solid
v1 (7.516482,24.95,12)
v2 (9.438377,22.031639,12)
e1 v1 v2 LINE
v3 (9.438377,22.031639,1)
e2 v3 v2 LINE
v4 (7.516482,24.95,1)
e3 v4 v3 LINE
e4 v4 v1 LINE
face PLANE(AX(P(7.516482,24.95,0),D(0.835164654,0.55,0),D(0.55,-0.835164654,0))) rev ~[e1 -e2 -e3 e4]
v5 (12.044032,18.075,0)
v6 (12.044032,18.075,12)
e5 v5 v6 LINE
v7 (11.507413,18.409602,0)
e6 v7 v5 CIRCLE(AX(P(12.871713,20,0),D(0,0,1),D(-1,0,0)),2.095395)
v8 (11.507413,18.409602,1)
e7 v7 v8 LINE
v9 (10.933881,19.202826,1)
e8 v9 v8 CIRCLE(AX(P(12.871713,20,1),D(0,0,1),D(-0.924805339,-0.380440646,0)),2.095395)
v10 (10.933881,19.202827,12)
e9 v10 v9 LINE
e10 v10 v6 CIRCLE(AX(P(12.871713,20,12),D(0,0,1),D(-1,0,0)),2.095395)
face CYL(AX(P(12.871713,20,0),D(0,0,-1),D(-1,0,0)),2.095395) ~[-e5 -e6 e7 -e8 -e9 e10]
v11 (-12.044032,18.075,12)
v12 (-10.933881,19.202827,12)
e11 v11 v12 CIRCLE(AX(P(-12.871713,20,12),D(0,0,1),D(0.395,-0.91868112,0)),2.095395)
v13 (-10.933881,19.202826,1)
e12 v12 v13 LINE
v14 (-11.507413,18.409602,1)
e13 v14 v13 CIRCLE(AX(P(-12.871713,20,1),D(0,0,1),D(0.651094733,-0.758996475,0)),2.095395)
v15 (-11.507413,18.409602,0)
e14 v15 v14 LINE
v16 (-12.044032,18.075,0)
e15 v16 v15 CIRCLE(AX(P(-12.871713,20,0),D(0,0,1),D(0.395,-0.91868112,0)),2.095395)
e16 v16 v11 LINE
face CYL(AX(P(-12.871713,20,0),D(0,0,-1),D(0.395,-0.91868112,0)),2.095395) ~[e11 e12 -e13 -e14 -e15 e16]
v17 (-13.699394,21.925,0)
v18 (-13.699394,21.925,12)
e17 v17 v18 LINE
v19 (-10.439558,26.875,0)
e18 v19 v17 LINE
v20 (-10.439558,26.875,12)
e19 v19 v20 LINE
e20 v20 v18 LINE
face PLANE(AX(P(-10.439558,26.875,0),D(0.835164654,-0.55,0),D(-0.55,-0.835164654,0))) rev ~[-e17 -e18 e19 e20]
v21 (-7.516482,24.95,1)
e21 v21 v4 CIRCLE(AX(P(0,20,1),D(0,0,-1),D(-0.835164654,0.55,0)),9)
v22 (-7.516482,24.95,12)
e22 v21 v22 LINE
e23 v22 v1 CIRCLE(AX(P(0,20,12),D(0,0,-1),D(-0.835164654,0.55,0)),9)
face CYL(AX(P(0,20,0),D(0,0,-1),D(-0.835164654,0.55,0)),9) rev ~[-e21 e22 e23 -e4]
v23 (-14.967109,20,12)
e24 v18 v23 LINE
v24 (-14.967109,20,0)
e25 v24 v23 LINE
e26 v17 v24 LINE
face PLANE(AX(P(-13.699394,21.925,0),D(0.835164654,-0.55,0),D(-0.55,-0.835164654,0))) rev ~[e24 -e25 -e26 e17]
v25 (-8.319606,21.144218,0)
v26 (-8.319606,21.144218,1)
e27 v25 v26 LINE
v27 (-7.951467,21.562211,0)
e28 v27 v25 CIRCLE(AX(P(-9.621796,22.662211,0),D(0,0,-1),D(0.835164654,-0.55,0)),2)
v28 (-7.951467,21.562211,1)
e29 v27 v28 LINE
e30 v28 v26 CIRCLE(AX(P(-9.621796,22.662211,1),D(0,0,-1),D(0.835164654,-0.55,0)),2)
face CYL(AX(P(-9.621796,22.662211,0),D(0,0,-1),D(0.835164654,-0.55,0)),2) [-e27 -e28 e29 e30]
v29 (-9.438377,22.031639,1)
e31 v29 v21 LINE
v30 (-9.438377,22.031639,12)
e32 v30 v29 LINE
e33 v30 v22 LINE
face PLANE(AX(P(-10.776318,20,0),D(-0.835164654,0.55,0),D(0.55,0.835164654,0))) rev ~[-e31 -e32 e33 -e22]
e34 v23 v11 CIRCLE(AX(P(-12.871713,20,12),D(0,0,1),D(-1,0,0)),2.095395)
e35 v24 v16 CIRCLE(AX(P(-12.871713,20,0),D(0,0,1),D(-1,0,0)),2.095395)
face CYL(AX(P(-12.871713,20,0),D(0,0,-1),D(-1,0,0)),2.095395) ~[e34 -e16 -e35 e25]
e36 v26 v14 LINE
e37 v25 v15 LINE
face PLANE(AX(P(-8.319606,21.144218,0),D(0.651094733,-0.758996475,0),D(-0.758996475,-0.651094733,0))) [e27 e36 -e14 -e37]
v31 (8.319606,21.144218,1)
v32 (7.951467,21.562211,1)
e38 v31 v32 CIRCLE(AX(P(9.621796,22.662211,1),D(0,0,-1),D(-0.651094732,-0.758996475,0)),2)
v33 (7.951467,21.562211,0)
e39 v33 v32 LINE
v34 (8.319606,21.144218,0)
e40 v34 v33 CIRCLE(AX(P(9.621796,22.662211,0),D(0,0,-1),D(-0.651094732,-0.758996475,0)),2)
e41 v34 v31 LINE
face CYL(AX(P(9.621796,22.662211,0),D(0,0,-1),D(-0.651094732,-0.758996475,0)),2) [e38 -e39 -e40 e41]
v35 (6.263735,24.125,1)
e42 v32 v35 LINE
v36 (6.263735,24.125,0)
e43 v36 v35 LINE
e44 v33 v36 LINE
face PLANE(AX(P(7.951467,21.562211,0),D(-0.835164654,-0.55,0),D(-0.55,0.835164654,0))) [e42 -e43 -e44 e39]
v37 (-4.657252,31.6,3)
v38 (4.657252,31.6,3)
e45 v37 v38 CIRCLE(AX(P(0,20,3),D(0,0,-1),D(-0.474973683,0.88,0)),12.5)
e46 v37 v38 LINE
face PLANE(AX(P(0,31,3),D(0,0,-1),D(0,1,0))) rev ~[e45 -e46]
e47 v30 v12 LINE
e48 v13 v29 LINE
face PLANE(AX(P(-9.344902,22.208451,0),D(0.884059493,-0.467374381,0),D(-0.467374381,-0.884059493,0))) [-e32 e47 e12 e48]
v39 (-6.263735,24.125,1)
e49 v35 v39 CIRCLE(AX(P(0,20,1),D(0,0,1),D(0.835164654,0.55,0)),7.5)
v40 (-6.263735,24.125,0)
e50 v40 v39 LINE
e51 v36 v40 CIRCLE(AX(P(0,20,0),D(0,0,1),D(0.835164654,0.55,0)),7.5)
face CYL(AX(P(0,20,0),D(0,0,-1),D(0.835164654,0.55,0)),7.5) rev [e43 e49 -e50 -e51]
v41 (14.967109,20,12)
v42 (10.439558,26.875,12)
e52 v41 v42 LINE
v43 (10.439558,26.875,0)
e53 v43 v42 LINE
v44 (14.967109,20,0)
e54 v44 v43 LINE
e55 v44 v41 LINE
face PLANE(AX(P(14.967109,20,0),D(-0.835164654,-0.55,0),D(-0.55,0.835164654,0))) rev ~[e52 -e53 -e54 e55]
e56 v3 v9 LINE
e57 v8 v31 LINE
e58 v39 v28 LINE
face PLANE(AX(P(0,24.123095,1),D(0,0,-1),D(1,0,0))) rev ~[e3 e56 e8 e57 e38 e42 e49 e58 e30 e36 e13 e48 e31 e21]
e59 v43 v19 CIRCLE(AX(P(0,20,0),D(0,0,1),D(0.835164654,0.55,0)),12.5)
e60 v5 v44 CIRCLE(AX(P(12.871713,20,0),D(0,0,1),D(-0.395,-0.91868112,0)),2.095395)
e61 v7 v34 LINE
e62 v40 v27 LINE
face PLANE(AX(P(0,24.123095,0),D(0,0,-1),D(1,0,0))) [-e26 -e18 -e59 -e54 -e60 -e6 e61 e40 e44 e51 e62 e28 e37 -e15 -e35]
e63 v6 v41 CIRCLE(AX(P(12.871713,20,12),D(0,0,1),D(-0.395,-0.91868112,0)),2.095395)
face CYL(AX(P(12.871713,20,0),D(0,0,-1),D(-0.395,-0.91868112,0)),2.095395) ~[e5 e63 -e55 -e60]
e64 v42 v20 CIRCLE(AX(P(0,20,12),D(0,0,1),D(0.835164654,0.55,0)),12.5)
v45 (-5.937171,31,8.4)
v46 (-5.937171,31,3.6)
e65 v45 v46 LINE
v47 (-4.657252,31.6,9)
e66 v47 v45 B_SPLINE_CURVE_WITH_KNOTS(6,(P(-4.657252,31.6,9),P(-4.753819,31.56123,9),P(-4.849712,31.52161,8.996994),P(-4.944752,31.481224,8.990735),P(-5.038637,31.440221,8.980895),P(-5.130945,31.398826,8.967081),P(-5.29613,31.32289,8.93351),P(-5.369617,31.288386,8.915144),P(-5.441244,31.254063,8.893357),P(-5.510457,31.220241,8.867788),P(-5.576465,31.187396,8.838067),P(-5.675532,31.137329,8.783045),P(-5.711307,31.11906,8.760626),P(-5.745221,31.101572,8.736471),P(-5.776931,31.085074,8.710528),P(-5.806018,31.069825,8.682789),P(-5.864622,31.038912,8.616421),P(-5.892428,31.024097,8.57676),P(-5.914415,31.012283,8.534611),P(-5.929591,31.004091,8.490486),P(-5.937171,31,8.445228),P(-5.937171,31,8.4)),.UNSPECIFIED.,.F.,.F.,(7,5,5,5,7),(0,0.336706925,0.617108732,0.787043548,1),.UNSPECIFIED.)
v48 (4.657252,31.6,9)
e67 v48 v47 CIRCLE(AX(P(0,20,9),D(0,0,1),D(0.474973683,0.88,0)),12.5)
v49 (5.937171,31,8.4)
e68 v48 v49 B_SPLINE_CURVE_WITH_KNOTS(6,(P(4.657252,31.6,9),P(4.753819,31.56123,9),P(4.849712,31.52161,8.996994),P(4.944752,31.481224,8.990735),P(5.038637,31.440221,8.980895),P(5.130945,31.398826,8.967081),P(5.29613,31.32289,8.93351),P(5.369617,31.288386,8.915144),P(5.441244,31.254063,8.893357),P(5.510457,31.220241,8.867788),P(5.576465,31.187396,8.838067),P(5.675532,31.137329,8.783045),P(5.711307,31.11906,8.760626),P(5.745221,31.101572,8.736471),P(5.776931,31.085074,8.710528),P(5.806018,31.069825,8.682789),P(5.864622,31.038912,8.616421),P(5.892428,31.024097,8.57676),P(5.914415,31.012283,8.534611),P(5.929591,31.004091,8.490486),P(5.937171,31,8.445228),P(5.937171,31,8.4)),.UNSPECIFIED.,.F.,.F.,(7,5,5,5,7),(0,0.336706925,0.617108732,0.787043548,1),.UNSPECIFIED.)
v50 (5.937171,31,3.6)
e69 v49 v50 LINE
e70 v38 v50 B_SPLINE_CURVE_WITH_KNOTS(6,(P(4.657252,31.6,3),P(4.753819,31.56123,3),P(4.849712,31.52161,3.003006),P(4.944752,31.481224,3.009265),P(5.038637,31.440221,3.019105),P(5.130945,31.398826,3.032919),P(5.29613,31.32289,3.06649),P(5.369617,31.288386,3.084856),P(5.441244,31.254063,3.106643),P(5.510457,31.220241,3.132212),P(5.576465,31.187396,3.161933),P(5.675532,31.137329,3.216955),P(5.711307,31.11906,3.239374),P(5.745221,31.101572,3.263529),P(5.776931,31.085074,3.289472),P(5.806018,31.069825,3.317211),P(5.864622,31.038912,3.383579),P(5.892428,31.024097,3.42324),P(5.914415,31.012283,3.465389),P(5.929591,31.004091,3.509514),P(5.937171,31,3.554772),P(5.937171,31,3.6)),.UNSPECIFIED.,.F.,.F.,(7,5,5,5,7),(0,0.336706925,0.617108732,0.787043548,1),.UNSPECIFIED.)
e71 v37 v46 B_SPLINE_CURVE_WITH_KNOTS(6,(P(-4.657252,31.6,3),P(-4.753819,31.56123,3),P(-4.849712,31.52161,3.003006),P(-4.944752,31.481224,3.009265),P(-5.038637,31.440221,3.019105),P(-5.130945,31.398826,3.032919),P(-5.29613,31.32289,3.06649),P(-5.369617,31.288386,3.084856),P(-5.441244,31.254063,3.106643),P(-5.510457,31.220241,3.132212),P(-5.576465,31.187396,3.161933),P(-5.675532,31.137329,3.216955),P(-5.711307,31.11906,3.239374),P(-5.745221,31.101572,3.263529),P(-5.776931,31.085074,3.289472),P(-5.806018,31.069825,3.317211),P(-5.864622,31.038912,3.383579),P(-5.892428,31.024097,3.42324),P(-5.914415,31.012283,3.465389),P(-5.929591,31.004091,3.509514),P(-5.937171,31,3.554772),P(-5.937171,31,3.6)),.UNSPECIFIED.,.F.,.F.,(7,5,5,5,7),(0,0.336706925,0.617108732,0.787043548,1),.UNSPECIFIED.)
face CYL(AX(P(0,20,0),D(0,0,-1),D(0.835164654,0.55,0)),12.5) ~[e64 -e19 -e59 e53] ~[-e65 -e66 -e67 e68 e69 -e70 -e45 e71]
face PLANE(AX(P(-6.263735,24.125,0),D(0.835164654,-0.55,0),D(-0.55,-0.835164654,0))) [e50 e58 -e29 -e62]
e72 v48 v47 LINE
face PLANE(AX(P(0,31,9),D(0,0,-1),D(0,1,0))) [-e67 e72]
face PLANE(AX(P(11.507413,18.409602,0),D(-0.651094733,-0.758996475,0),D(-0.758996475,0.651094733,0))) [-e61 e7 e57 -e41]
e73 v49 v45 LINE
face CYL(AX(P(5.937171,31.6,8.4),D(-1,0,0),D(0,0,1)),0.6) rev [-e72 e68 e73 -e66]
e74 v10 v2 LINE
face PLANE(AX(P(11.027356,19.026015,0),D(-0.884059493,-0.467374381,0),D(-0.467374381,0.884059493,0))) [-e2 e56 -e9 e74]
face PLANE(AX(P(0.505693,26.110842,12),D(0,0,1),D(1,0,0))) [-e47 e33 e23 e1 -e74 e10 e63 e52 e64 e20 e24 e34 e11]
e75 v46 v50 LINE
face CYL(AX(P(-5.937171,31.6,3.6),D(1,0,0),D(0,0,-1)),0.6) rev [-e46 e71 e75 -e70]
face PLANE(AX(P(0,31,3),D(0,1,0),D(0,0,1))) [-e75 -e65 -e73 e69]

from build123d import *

# Parameters (mm, degrees)
F1_DEPTH    = 12
F2_W        = 1.5
F2_H        = 6
F3_DEPTH    = 12.5
F4_R        = 0.6
F5_T1_DEPTH = 12
F7_DEPTH    = 1


# Not quite as in the source:
# - a fillet or chamfer that OpenCascade refuses, or shapes differently, is made with other operations: its cross-section is extruded or revolved along the edge and cut away or added


with BuildPart() as f1:
    # F0 (on Top) → F1 (new body)
    with BuildSketch(Plane.XY):
        with BuildLine():
            ThreePointArc((-7.5164818898, 24.95), (0, 29), (7.5164818898, 24.95))
            Line((7.5164818898, 24.95), (10.7763181216, 20))
            Line((10.7763181216, 20), (14.9671085022, 20))
            Line((14.9671085022, 20), (10.4395581803, 26.875))
            ThreePointArc((10.4395581803, 26.875), (0, 32.5), (-10.4395581803, 26.875))
            Line((-10.4395581803, 26.875), (-13.6993944121, 21.925))
            ThreePointArc((-13.6993944121, 21.925), (-11.7192459572, 21.75), (-10.7763181216, 20))
            Line((-10.7763181216, 20), (-7.5164818898, 24.95))
        make_face()
        with BuildLine():
            Line((14.9671085022, 20), (10.7763181216, 20))
            Line((10.7763181216, 20), (12.0440322117, 18.075))
            ThreePointArc((12.0440322117, 18.075), (14.0241806666, 18.25), (14.9671085022, 20))
        make_face()
        with BuildLine():
            Line((12.0440322117, 18.075), (10.7763181216, 20))
            ThreePointArc((10.7763181216, 20), (11.1217133119, 18.8475326453), (12.0440322117, 18.075))
        make_face()
        with BuildLine():
            ThreePointArc((-12.0440322117, 18.075), (-11.1217133119, 18.8475326453), (-10.7763181216, 20))
            Line((-10.7763181216, 20), (-12.0440322117, 18.075))
        make_face()
        with BuildLine():
            Line((-12.0440322117, 18.075), (-10.7763181216, 20))
            Line((-10.7763181216, 20), (-14.9671085022, 20))
            ThreePointArc((-14.9671085022, 20), (-14.0241806666, 18.25), (-12.0440322117, 18.075))
        make_face()
        with BuildLine():
            Line((-14.9671085022, 20), (-10.7763181216, 20))
            ThreePointArc((-10.7763181216, 20), (-11.7192459572, 21.75), (-13.6993944121, 21.925))
            Line((-13.6993944121, 21.925), (-14.9671085022, 20))
        make_face()
    extrude(amount=F1_DEPTH)

    # F2 (on Right) → F3 (cut, symmetric)
    with BuildSketch(Plane.YZ):
        with Locations((31.75, 6)):
            Rectangle(F2_W, F2_H)
    extrude(amount=F3_DEPTH, both=True, mode=Mode.SUBTRACT)

    # F4
    f4_edges = [f1.edges().sort_by_distance(p)[0] for p in [
        (0, 31, 9),
        (0, 31, 3),
    ]]
    fillet(f4_edges, radius=F4_R)

    # F5: chamfer of 5 on 2 edges, made by hand

    # F5_s2 → F5_t1 (join)
    with BuildSketch(Plane.XY):
        with BuildLine():
            Line((11.0273555293, 19.0260146009), (9.3449019992, 22.2084505142))
            Line((9.3449019992, 22.2084505142), (9.4284184646, 22.2634505142))
            ThreePointArc((9.4284184646, 22.2634505142), (10.1361174506, 21.1539508584), (10.859834587, 20.055))
            Line((10.859834587, 20.055), (10.8763181216, 20))
            ThreePointArc((10.8763181216, 20), (10.9346351532, 19.5211157003), (11.1198360632, 19.0640586655))
            Line((11.1198360632, 19.0640586655), (11.0273555293, 19.0260146009))
        make_face()
        with BuildLine():
            Line((-9.3449019992, 22.2084505142), (-11.0273555293, 19.0260146009))
            Line((-11.0273555293, 19.0260146009), (-11.1198360632, 19.0640586655))
            ThreePointArc((-11.1198360632, 19.0640586655), (-10.9346351532, 19.5211157003), (-10.8763181216, 20))
            Line((-10.8763181216, 20), (-10.859834587, 20.055))
            ThreePointArc((-10.859834587, 20.055), (-10.1361174506, 21.1539508584), (-9.4284184646, 22.2634505142))
            Line((-9.4284184646, 22.2634505142), (-9.3449019992, 22.2084505142))
        make_face()
    extrude(amount=F5_T1_DEPTH)

    # F6 (on face) → F7 (join)
    with BuildSketch(Plane(origin=(0, 0, 0), x_dir=(1, 0, 0), z_dir=(0, 0, -1))):
        with BuildLine():
            ThreePointArc((-7.5164818898, -24.95), (0, -29), (7.5164818898, -24.95))
            Line((7.5164818898, -24.95), (9.4383768754, -22.0316386155))
            Line((9.4383768756, -22.0316386152), (10.9338806529, -19.2028264998))
            ThreePointArc((10.9338806529, -19.2028264998), (11.1736784475, -18.772254667), (11.507412541, -18.4096024365))
            Line((11.507412541, -18.4096024365), (8.3196064123, -21.1442182701))
            ThreePointArc((8.3196064123, -21.1442182701), (8.1209139726, -21.3403362232), (7.9514665684, -21.5622112204))
            Line((7.9514665684, -21.5622112204), (6.2637349082, -24.125))
            ThreePointArc((6.2637349082, -24.125), (0, -27.5), (-6.2637349082, -24.125))
            Line((-6.2637349082, -24.125), (-7.9514665684, -21.5622112204))
            ThreePointArc((-7.9514665684, -21.5622112204), (-8.1209139726, -21.3403362232), (-8.3196064123, -21.1442182701))
            Line((-8.3196064123, -21.1442182701), (-11.507412541, -18.4096024365))
            ThreePointArc((-11.507412541, -18.4096024365), (-11.1736784475, -18.772254667), (-10.9338806529, -19.2028264998))
            Line((-10.9338806529, -19.2028264998), (-9.4383768756, -22.0316386152))
            Line((-9.4383768756, -22.0316386152), (-7.5164818898, -24.95))
        make_face()
    extrude(amount=-F7_DEPTH)


solid = f1.part
